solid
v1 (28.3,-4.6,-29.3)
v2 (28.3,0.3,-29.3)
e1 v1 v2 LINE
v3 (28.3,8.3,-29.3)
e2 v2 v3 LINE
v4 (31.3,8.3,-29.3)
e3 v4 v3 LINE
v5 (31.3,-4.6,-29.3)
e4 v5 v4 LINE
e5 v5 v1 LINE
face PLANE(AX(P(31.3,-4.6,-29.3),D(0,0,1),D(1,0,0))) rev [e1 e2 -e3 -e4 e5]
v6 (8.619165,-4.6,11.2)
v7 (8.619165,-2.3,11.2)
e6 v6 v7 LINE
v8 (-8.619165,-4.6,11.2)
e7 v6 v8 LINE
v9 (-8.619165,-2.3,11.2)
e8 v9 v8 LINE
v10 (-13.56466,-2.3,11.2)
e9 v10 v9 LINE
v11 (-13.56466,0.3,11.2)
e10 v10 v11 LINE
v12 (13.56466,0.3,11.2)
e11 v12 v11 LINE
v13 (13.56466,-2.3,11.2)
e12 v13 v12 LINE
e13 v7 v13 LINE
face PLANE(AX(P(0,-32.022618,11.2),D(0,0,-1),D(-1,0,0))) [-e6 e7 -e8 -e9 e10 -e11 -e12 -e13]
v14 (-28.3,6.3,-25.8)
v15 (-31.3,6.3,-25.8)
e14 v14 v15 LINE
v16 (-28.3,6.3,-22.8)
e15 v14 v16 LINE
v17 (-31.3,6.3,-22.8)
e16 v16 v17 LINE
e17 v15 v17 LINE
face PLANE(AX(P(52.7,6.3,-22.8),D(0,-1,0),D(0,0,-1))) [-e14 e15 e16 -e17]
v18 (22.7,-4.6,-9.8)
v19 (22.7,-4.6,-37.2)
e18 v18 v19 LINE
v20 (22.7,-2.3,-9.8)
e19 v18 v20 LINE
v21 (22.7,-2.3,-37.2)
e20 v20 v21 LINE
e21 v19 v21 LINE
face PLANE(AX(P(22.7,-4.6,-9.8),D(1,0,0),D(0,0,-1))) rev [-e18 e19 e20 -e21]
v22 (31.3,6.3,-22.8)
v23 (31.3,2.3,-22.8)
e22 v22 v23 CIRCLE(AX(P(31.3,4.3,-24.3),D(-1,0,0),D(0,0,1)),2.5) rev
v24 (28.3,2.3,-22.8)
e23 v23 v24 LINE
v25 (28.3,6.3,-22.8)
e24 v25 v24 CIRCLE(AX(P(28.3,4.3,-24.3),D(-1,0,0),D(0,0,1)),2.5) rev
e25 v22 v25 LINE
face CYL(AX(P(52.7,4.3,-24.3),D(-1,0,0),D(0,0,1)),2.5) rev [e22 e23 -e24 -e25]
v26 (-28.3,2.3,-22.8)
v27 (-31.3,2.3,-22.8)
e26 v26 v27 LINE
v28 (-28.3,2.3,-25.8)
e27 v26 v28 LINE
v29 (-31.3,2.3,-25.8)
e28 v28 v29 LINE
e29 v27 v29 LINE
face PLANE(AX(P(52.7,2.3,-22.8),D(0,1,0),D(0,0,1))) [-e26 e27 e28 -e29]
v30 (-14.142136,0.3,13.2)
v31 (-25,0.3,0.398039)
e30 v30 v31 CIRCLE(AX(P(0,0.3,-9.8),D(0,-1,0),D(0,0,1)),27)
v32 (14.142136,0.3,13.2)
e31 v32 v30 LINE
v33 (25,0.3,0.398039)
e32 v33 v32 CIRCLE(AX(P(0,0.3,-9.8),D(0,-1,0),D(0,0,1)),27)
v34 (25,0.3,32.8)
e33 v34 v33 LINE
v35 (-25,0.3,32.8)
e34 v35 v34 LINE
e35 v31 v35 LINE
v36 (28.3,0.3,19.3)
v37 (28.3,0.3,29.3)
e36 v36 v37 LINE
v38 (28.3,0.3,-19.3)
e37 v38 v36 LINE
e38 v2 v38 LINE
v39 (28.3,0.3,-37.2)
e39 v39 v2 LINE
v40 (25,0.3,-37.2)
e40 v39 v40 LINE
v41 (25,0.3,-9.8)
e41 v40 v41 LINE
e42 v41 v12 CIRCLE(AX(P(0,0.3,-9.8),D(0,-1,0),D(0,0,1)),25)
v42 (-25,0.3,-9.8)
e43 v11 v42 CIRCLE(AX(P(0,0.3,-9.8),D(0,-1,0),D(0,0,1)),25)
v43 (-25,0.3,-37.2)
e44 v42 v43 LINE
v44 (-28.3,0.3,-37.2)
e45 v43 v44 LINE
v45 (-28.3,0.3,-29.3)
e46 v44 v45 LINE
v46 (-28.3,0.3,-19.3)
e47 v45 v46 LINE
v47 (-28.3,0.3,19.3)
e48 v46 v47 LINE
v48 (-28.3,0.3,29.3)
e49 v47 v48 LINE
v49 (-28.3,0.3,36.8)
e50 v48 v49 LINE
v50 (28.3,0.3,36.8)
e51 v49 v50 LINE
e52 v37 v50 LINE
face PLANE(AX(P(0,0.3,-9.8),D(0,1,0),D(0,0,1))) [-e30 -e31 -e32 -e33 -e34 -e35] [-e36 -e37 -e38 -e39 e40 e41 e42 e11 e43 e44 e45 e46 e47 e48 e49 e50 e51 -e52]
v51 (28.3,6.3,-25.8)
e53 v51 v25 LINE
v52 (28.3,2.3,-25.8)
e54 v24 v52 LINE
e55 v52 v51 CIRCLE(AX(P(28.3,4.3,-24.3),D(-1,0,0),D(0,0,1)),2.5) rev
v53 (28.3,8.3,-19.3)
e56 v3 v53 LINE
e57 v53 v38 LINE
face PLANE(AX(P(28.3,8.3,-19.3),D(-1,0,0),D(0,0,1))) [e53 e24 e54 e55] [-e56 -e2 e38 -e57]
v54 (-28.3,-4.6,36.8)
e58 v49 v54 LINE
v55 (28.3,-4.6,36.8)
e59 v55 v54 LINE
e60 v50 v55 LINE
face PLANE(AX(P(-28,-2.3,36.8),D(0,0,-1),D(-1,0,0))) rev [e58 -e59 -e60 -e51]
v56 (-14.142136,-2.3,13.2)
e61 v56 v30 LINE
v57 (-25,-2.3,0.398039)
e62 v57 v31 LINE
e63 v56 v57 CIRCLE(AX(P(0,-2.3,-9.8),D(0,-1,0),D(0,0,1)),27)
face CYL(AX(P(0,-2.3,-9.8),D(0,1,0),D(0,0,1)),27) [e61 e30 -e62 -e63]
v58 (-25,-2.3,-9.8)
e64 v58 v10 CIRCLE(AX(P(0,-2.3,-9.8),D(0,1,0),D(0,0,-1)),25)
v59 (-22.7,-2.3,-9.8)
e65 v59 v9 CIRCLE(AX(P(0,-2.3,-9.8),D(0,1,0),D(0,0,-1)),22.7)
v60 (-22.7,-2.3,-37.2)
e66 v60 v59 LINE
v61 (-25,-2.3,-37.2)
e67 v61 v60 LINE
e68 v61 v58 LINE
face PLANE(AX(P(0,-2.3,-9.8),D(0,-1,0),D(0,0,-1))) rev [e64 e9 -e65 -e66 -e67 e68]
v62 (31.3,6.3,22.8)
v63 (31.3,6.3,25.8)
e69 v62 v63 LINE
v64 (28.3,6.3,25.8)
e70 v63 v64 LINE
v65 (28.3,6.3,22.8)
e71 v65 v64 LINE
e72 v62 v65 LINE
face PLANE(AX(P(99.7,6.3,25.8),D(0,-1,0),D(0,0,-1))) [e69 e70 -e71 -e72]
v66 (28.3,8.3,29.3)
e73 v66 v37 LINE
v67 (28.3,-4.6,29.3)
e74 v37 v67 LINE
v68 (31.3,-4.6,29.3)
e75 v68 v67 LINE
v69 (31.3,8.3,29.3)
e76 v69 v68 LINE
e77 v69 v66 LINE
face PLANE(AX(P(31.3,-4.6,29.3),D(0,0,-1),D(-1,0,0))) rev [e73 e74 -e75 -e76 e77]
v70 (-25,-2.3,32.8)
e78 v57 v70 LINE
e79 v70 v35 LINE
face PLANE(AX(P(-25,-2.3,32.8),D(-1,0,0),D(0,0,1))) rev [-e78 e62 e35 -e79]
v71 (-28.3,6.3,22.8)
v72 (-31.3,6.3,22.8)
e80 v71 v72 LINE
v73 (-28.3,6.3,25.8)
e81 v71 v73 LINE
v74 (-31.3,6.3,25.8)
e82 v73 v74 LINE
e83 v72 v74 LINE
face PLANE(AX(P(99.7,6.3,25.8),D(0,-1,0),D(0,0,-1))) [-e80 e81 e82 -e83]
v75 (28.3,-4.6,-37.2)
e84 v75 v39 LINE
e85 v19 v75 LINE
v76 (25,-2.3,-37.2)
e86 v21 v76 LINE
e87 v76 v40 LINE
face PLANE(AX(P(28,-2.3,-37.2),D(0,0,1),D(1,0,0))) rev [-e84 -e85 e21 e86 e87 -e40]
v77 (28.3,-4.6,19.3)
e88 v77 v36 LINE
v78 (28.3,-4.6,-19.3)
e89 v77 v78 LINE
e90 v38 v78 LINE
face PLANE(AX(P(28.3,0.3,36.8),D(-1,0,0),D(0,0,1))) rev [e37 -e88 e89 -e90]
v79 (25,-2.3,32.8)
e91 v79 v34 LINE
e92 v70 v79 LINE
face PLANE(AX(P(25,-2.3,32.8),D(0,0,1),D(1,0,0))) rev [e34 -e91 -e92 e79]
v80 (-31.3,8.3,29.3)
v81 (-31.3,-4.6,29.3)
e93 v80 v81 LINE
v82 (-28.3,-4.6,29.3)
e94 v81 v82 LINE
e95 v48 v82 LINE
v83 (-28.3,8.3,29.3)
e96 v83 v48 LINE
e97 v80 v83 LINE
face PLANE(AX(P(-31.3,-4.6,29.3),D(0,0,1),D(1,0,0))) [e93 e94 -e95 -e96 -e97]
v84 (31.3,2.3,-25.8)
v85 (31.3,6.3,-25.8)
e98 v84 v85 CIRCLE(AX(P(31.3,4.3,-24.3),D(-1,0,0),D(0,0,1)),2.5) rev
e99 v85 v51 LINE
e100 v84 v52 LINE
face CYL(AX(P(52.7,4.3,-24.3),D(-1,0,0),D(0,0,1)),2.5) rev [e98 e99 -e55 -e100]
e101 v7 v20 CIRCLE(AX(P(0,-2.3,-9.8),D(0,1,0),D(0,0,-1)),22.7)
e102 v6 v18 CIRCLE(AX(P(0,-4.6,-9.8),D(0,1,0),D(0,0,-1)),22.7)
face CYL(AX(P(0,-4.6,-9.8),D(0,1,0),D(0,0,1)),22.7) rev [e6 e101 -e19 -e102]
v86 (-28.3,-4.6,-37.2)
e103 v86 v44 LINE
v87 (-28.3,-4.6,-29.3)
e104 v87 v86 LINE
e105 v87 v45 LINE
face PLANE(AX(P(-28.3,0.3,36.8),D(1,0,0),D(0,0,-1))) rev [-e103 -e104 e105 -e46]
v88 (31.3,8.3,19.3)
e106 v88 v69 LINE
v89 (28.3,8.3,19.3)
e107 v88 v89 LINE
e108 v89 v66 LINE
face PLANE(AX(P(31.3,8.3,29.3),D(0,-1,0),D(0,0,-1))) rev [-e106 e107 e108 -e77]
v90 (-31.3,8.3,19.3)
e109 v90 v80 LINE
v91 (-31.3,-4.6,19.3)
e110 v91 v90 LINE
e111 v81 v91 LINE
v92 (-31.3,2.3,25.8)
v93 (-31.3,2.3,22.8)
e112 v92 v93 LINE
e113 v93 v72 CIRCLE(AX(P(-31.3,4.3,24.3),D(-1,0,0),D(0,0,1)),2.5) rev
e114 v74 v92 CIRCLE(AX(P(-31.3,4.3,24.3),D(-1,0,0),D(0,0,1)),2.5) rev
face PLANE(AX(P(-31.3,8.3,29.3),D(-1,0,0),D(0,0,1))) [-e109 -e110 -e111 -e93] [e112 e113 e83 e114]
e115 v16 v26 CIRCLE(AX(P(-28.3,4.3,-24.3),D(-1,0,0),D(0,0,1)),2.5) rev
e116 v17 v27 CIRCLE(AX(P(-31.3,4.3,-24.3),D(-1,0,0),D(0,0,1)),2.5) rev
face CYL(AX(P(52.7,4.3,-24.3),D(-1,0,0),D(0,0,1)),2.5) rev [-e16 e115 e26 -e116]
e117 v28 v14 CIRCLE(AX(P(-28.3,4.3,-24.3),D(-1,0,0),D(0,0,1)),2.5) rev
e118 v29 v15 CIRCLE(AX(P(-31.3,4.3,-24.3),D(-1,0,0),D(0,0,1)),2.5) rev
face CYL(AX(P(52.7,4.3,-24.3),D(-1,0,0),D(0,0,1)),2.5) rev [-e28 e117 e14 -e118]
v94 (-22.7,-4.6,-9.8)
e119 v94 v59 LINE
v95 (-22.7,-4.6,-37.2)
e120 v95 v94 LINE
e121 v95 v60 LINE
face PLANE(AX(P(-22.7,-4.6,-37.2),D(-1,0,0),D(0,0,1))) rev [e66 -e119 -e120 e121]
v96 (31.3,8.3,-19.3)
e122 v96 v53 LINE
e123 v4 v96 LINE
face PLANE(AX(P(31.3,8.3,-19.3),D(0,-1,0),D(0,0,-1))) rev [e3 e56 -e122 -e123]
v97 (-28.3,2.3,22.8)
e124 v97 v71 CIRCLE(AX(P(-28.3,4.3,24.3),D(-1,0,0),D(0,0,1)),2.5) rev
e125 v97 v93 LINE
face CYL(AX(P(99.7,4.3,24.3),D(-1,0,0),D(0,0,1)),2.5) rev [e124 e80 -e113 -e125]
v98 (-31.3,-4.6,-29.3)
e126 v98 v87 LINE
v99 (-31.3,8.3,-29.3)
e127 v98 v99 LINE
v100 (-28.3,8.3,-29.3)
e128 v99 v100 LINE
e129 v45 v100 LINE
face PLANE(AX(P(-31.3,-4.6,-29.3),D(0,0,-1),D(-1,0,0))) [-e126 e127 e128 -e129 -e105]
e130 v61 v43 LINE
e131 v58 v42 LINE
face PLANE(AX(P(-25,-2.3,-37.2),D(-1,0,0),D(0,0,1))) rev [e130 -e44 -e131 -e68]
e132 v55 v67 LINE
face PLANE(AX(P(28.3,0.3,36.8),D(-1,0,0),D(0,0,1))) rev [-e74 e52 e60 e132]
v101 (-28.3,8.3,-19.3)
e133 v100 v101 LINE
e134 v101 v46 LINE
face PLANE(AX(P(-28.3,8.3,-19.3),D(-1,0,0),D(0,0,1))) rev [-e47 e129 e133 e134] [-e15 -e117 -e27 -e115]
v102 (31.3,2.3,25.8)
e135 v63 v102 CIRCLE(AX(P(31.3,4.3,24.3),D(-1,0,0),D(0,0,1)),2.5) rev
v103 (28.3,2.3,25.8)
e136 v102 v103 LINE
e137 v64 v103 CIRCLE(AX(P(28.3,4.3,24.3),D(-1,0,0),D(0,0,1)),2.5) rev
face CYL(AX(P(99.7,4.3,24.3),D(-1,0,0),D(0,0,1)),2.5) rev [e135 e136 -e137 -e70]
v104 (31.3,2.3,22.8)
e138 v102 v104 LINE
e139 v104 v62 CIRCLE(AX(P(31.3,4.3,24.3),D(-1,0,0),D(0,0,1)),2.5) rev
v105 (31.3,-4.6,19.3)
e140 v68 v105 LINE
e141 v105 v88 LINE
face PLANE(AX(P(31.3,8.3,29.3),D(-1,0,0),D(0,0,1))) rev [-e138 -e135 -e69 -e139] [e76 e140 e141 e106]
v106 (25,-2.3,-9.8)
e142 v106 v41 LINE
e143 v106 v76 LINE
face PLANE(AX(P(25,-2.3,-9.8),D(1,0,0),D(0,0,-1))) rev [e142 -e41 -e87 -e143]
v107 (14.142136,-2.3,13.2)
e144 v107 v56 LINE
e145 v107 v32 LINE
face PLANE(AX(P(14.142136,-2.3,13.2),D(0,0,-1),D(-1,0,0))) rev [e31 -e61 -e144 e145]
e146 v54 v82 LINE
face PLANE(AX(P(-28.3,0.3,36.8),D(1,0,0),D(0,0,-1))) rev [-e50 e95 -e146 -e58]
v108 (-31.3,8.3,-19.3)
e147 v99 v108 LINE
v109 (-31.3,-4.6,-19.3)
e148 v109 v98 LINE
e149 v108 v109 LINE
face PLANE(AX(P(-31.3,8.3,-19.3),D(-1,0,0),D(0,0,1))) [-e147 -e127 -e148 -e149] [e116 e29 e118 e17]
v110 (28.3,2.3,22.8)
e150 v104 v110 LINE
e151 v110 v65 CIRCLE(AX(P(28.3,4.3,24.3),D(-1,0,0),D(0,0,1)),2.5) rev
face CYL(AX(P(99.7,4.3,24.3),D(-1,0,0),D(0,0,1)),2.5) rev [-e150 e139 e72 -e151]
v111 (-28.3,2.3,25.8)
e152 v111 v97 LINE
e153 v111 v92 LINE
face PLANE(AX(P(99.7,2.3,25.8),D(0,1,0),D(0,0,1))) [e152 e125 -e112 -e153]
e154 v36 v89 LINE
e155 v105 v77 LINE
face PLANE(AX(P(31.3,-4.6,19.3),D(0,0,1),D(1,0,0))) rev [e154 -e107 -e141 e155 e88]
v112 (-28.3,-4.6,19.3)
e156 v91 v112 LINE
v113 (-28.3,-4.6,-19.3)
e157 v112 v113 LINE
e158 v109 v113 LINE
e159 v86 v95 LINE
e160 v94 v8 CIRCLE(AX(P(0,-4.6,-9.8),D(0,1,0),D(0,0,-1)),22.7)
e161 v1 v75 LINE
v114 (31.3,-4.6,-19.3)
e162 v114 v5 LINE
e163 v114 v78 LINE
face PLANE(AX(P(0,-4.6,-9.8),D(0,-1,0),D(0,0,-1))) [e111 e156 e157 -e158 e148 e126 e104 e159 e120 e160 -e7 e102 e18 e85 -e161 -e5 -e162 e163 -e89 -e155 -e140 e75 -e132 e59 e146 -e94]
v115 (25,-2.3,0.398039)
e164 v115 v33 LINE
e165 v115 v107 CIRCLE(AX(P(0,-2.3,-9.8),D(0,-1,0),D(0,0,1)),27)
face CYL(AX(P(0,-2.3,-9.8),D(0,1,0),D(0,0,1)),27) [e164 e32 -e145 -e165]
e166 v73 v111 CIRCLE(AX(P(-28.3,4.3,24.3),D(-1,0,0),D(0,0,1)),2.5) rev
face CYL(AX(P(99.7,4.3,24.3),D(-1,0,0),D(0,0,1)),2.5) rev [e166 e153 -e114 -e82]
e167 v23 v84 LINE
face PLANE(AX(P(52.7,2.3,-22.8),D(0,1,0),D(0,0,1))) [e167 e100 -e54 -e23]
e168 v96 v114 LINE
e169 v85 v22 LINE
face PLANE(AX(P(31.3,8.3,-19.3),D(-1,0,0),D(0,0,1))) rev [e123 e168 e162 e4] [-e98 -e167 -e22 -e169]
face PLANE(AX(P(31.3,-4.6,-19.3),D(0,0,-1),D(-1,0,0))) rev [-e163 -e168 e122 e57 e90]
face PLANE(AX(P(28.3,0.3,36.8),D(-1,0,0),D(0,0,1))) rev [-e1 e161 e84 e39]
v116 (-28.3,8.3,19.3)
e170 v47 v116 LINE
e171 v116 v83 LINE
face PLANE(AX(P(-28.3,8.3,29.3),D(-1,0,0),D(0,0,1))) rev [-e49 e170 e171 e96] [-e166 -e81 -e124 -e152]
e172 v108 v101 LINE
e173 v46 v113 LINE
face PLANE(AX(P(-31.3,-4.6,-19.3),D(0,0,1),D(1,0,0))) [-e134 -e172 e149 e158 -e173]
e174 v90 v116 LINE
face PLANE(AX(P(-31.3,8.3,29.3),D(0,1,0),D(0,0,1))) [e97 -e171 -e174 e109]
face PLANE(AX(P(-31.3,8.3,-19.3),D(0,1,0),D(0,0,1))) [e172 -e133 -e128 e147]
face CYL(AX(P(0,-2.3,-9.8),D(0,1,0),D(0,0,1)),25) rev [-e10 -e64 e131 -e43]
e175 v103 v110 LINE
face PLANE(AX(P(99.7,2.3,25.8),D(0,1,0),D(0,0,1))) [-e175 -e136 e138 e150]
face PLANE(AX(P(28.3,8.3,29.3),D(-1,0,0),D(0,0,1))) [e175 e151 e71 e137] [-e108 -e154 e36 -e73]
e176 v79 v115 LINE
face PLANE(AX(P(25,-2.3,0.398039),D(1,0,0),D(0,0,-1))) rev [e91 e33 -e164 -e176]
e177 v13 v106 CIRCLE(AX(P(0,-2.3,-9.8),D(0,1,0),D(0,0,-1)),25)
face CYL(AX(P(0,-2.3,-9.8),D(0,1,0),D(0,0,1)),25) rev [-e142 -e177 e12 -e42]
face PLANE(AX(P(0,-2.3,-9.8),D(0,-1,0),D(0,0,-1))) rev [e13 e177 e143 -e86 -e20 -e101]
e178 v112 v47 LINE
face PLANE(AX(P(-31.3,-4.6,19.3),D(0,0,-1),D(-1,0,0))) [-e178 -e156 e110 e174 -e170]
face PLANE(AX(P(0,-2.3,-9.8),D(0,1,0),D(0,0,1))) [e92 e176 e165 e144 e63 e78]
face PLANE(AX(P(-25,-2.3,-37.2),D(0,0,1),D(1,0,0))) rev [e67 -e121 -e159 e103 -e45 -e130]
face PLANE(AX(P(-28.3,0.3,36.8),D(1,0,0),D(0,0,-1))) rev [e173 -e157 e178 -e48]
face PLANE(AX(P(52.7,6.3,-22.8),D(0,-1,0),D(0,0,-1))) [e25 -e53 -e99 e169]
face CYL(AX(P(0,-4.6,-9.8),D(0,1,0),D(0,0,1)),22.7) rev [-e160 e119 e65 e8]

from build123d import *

# Parameters (mm, degrees)
STOCK_BATTERY_START                           = -4.6
STOCK_BATTERY_AND_MICRO_COMPARTMENT_1_DEPTH   = 4.6
STOCK_BATTERY_AND_MICRO_COMPARTMENT_1_2_DEPTH = 2.3
BOSS_EXTRUDE1_START                           = -4.6
BOSS_EXTRUDE1_DEPTH                           = 4.6
CUT_EXTRUDE1_DEPTH                            = 2.3
BOSS_EXTRUDE2_DEPTH                           = 0.3
SKETCH4_W                                     = 74
SKETCH4_H                                     = 4.9
BOSS_EXTRUDE3_DEPTH                           = 0.3
BOSS_EXTRUDE4_START                           = -56.3
SKETCH4_2_W                                   = 74
SKETCH4_2_H                                   = 4.9
BOSS_EXTRUDE4_DEPTH                           = 0.3
SKETCH5_W                                     = 10
SKETCH5_H                                     = 12.9
BOSS_EXTRUDE5_DEPTH                           = 3
BOSS_EXTRUDE7_START                           = -56.6
SKETCH5_2_W                                   = 10
SKETCH5_2_H                                   = 12.9
BOSS_EXTRUDE7_DEPTH                           = 3
CUT_EXTRUDE2_DEPTH                            = 81
CUT_EXTRUDE2_DEPTH_BACK                       = 10
CUT_EXTRUDE3_DEPTH                            = 128
CUT_EXTRUDE3_DEPTH_BACK                       = 10
BOSS_EXTRUDE8_REACH                           = 51.27
BOSS_EXTRUDE8_DIRECTION_2_DEPTH               = 0.03
BOSS_EXTRUDE9_DEPTH                           = 2
SPLIT1_START                                  = 0.33
SPLIT1_DEPTH                                  = 2
SPLIT1_START_2                                = -2.3
SPLIT1_2_DEPTH                                = 2.63


# Read off the part's stored shape, not the designer's step: Stock-Battery and Micro compartment-1, Split1
with BuildPart() as part:
    # Stock-Battery and Micro compartment-1 ou → Stock-Battery and Micro compartment-1 (new body)
    with BuildSketch(Plane(origin=(0, 0, 0), x_dir=(1, 0, 0), z_dir=(0, 1, 0)).offset(STOCK_BATTERY_START)):
        with BuildLine():
            Line((-28, 37.2), (-28, -36.8))
            Line((-28, -36.8), (28, -36.8))
            Line((28, -36.8), (28, 37.2))
            Line((28, 37.2), (25, 37.2))
            Line((25, 37.2), (25, 9.8))
            ThreePointArc((25, 9.8), (0, -15.2), (-25, 9.8))
            Line((-25, 9.8), (-25, 37.2))
            Line((-25, 37.2), (-28, 37.2))
        make_face()
    extrude(amount=STOCK_BATTERY_AND_MICRO_COMPARTMENT_1_DEPTH)

    # Stock-Battery and Micro compartment- 2 → Stock-Battery and Micro compartment-1 2 (add)
    with BuildSketch(Plane(origin=(0, 0, 0), x_dir=(1, 0, 0), z_dir=(0, 1, 0)).offset(STOCK_BATTERY_START)):
        with BuildLine():
            Line((-22.7, 37.2), (-25, 37.2))
            Line((-25, 37.2), (-25, 9.8))
            ThreePointArc((-25, 9.8), (0, -15.2), (25, 9.8))
            Line((25, 9.8), (25, 37.2))
            Line((25, 37.2), (22.7, 37.2))
            Line((22.7, 37.2), (22.7, 9.8))
            ThreePointArc((22.7, 9.8), (0, -12.9), (-22.7, 9.8))
            Line((-22.7, 9.8), (-22.7, 37.2))
        make_face()
    extrude(amount=STOCK_BATTERY_AND_MICRO_COMPARTMENT_1_2_DEPTH)

    # Sketch2 → Boss-Extrude1 (add)
    with BuildSketch(Plane(origin=(0, 0, 0), x_dir=(1, 0, 0), z_dir=(0, 1, 0)).offset(BOSS_EXTRUDE1_START)):
        with BuildLine():
            Line((0, -11.2), (-13.564659966, -11.2))
            ThreePointArc((-13.564659966, -11.2), (0, -15.2), (13.564659966, -11.2))
            Line((13.564659966, -11.2), (0, -11.2))
        make_face()
    extrude(amount=BOSS_EXTRUDE1_DEPTH)

    # Sketch1 → Cut-Extrude1 (cut)
    with BuildSketch(Plane(origin=(0, 0, 0), x_dir=(1, 0, 0), z_dir=(0, 1, 0))):
        with BuildLine():
            Line((14.142135624, -13.2), (-14.142135624, -13.2))
            ThreePointArc((-14.142135624, -13.2), (-20.591241985, -7.66427077), (-25, -0.398039027))
            Line((-25, -0.398039027), (-25, -32.8))
            Line((-25, -32.8), (25, -32.8))
            Line((25, -32.8), (25, -0.398039027))
            ThreePointArc((25, -0.398039027), (20.591241985, -7.66427077), (14.142135624, -13.2))
        make_face()
    extrude(amount=-CUT_EXTRUDE1_DEPTH, mode=Mode.SUBTRACT)

    # Sketch3 → Boss-Extrude2 (add)
    with BuildSketch(Plane(origin=(0, 0, 0), x_dir=(1, 0, 0), z_dir=(0, 1, 0))):
        with BuildLine():
            Line((-25, 37.2), (-28, 37.2))
            Line((-28, 37.2), (-28, -36.8))
            Line((-28, -36.8), (28, -36.8))
            Line((28, -36.8), (28, 37.2))
            Line((28, 37.2), (25, 37.2))
            Line((25, 37.2), (25, 9.8))
            ThreePointArc((25, 9.8), (21.955824958, -2.155824958), (13.564659966, -11.2))
            Line((13.564659966, -11.2), (-13.564659966, -11.2))
            ThreePointArc((-13.564659966, -11.2), (-21.955824958, -2.155824958), (-25, 9.8))
            Line((-25, 9.8), (-25, 37.2))
        make_face()
        with BuildLine():
            Line((-25, -32.8), (25, -32.8))
            Line((25, -32.8), (25, -0.398039027))
            ThreePointArc((25, -0.398039027), (20.591241985, -7.66427077), (14.142135624, -13.2))
            Line((14.142135624, -13.2), (-14.142135624, -13.2))
            ThreePointArc((-14.142135624, -13.2), (-20.591241985, -7.66427077), (-25, -0.398039027))
            Line((-25, -0.398039027), (-25, -32.8))
        make_face(mode=Mode.SUBTRACT)
    extrude(amount=BOSS_EXTRUDE2_DEPTH)

    # Sketch4 → Boss-Extrude3 (add)
    with BuildSketch(Plane(origin=(28, 0, 0), x_dir=(0, 0, -1), z_dir=(1, 0, 0))):
        with Locations((0.2, -2.15)):
            Rectangle(SKETCH4_W, SKETCH4_H)
    extrude(amount=BOSS_EXTRUDE3_DEPTH)

    # Sketch4<2> → Boss-Extrude4 (add)
    with BuildSketch(Plane(origin=(28, 0, 0), x_dir=(0, 0, -1), z_dir=(1, 0, 0)).offset(BOSS_EXTRUDE4_START)):
        with Locations((0.2, -2.15)):
            Rectangle(SKETCH4_2_W, SKETCH4_2_H)
    extrude(amount=BOSS_EXTRUDE4_DEPTH)

    # Sketch5 → Boss-Extrude5 (add)
    with BuildSketch(Plane(origin=(28.3, 0, 0), x_dir=(0, 0, -1), z_dir=(1, 0, 0))):
        with Locations((-24.3, 1.85)):
            Rectangle(SKETCH5_W, SKETCH5_H)
        with Locations((24.3, 1.85)):
            Rectangle(SKETCH5_W, SKETCH5_H)
    extrude(amount=BOSS_EXTRUDE5_DEPTH)

    # Sketch5<2> → Boss-Extrude7 (add)
    with BuildSketch(Plane(origin=(28.3, 0, 0), x_dir=(0, 0, -1), z_dir=(1, 0, 0)).offset(BOSS_EXTRUDE7_START)):
        with Locations((-24.3, 1.85)):
            Rectangle(SKETCH5_2_W, SKETCH5_2_H)
        with Locations((24.3, 1.85)):
            Rectangle(SKETCH5_2_W, SKETCH5_2_H)
    extrude(amount=-BOSS_EXTRUDE7_DEPTH)

    # Sketch8 → Cut-Extrude2 (cut, two sides: drawn at the far end of the back side and taken through both)
    with BuildSketch(Plane(origin=(-28.3, 0, 0), x_dir=(0, 0, -1), z_dir=(1, 0, 0)).offset(-CUT_EXTRUDE2_DEPTH_BACK)):
        with BuildLine():
            Line((22.8, 2.3), (25.8, 2.3))
            ThreePointArc((25.8, 2.3), (26.8, 4.3), (25.8, 6.3))
            Line((25.8, 6.3), (22.8, 6.3))
            ThreePointArc((22.8, 6.3), (21.8, 4.3), (22.8, 2.3))
        make_face()
    extrude(amount=CUT_EXTRUDE2_DEPTH + CUT_EXTRUDE2_DEPTH_BACK, mode=Mode.SUBTRACT)

    # Sketch9 → Cut-Extrude3 (cut, two sides: drawn at the far end of the back side and taken through both)
    with BuildSketch(Plane(origin=(-28.3, 0, 0), x_dir=(0, 0, -1), z_dir=(1, 0, 0)).offset(-CUT_EXTRUDE3_DEPTH_BACK)):
        with BuildLine():
            Line((-25.8, 2.3), (-22.8, 2.3))
            ThreePointArc((-22.8, 2.3), (-21.8, 4.3), (-22.8, 6.3))
            Line((-22.8, 6.3), (-25.8, 6.3))
            ThreePointArc((-25.8, 6.3), (-26.8, 4.3), (-25.8, 2.3))
        make_face()
    extrude(amount=CUT_EXTRUDE3_DEPTH + CUT_EXTRUDE3_DEPTH_BACK, mode=Mode.SUBTRACT)


with BuildPart() as body_2:

    # Sketch10 → Boss-Extrude8 (new, up to next)
    with BuildSketch(Plane(origin=(0, 0.3, 0), x_dir=(1, 0, 0), z_dir=(0, 1, 0)), mode=Mode.PRIVATE) as boss_extrude8_sk1:
        with BuildLine():
            Line((14.142135624, -13.2), (-14.142135624, -13.2))
            ThreePointArc((-14.142135624, -13.2), (-20.180507814, -8.137310399), (-24.5, -1.546805718))
            Line((-24.5, -1.546805718), (-24.5, -5.716120649))
            ThreePointArc((-24.5, -5.716120649), (-20.163977484, -11.042600894), (-14.696938457, -15.2))
            Line((-14.696938457, -15.2), (14.696938457, -15.2))
            ThreePointArc((14.696938457, -15.2), (20.163977484, -11.042600894), (24.5, -5.716120649))
            Line((24.5, -5.716120649), (24.5, -1.546805718))
            ThreePointArc((24.5, -1.546805718), (20.180507814, -8.137310399), (14.142135624, -13.2))
        make_face()
    boss_extrude8_tool1 = extrude(boss_extrude8_sk1.sketch, amount=-BOSS_EXTRUDE8_REACH, mode=Mode.PRIVATE) - part.part
    add(boss_extrude8_tool1.solids().sort_by_distance((0, 0.3, 13.708666))[0])

    # Sketch10 → Boss-Extrude8 direction 2 (add)
    with BuildSketch(Plane(origin=(0, 0.3, 0), x_dir=(1, 0, 0), z_dir=(0, 1, 0))):
        with BuildLine():
            Line((14.142135624, -13.2), (-14.142135624, -13.2))
            ThreePointArc((-14.142135624, -13.2), (-20.180507814, -8.137310399), (-24.5, -1.546805718))
            Line((-24.5, -1.546805718), (-24.5, -5.716120649))
            ThreePointArc((-24.5, -5.716120649), (-20.163977484, -11.042600894), (-14.696938457, -15.2))
            Line((-14.696938457, -15.2), (14.696938457, -15.2))
            ThreePointArc((14.696938457, -15.2), (20.163977484, -11.042600894), (24.5, -5.716120649))
            Line((24.5, -5.716120649), (24.5, -1.546805718))
            ThreePointArc((24.5, -1.546805718), (20.180507814, -8.137310399), (14.142135624, -13.2))
        make_face()
    extrude(amount=BOSS_EXTRUDE8_DIRECTION_2_DEPTH)

    # Sketch11 → Boss-Extrude9 (add)
    with BuildSketch(Plane(origin=(0, 0.33, 0), x_dir=(1, 0, 0), z_dir=(0, 1, 0))):
        with BuildLine():
            Line((-24.5, 8.453194282), (-24.5, -5.716120649))
            ThreePointArc((-24.5, -5.716120649), (-20.163977484, -11.042600894), (-14.696938457, -15.2))
            Line((-14.696938457, -15.2), (14.696938457, -15.2))
            ThreePointArc((14.696938457, -15.2), (20.163977484, -11.042600894), (24.5, -5.716120649))
            Line((24.5, -5.716120649), (24.5, -1.546805718))
            Line((24.5, -1.546805718), (24.5, 8.453194282))
            Line((24.5, 8.453194282), (-24.5, 8.453194282))
        make_face()
    extrude(amount=BOSS_EXTRUDE9_DEPTH)

    # Split1 outline → Split1 (cut)
    with BuildSketch(Plane(origin=(0, 0, 0), x_dir=(1, 0, 0), z_dir=(0, 1, 0)).offset(SPLIT1_START)):
        with BuildLine():
            Line((24.5, -5.716120649), (24.5, 8.453194282))
            Line((24.5, 8.453194282), (-24.5, 8.453194282))
            Line((-24.5, 8.453194282), (-24.5, -5.716120649))
            ThreePointArc((-24.5, -5.716120649), (-20.163977484, -11.042600894), (-14.696938457, -15.2))
            Line((-14.696938457, -15.2), (14.696938457, -15.2))
            ThreePointArc((14.696938457, -15.2), (20.163977484, -11.042600894), (24.5, -5.716120649))
        make_face()
    extrude(amount=SPLIT1_DEPTH, mode=Mode.SUBTRACT)

    # Split1 2 outline → Split1 2 (cut)
    with BuildSketch(Plane(origin=(0, 0, 0), x_dir=(1, 0, 0), z_dir=(0, 1, 0)).offset(SPLIT1_START_2)):
        with BuildLine():
            Line((24.5, -5.716120649), (24.5, -1.546805718))
            ThreePointArc((24.5, -1.546805718), (20.180507814, -8.137310399), (14.142135624, -13.2))
            Line((14.142135624, -13.2), (-14.142135624, -13.2))
            ThreePointArc((-14.142135624, -13.2), (-20.180507814, -8.137310399), (-24.5, -1.546805718))
            Line((-24.5, -1.546805718), (-24.5, -5.716120649))
            ThreePointArc((-24.5, -5.716120649), (-20.163977484, -11.042600894), (-14.696938457, -15.2))
            Line((-14.696938457, -15.2), (14.696938457, -15.2))
            ThreePointArc((14.696938457, -15.2), (20.163977484, -11.042600894), (24.5, -5.716120649))
        make_face()
    extrude(amount=SPLIT1_2_DEPTH, mode=Mode.SUBTRACT)


solid = part.part
